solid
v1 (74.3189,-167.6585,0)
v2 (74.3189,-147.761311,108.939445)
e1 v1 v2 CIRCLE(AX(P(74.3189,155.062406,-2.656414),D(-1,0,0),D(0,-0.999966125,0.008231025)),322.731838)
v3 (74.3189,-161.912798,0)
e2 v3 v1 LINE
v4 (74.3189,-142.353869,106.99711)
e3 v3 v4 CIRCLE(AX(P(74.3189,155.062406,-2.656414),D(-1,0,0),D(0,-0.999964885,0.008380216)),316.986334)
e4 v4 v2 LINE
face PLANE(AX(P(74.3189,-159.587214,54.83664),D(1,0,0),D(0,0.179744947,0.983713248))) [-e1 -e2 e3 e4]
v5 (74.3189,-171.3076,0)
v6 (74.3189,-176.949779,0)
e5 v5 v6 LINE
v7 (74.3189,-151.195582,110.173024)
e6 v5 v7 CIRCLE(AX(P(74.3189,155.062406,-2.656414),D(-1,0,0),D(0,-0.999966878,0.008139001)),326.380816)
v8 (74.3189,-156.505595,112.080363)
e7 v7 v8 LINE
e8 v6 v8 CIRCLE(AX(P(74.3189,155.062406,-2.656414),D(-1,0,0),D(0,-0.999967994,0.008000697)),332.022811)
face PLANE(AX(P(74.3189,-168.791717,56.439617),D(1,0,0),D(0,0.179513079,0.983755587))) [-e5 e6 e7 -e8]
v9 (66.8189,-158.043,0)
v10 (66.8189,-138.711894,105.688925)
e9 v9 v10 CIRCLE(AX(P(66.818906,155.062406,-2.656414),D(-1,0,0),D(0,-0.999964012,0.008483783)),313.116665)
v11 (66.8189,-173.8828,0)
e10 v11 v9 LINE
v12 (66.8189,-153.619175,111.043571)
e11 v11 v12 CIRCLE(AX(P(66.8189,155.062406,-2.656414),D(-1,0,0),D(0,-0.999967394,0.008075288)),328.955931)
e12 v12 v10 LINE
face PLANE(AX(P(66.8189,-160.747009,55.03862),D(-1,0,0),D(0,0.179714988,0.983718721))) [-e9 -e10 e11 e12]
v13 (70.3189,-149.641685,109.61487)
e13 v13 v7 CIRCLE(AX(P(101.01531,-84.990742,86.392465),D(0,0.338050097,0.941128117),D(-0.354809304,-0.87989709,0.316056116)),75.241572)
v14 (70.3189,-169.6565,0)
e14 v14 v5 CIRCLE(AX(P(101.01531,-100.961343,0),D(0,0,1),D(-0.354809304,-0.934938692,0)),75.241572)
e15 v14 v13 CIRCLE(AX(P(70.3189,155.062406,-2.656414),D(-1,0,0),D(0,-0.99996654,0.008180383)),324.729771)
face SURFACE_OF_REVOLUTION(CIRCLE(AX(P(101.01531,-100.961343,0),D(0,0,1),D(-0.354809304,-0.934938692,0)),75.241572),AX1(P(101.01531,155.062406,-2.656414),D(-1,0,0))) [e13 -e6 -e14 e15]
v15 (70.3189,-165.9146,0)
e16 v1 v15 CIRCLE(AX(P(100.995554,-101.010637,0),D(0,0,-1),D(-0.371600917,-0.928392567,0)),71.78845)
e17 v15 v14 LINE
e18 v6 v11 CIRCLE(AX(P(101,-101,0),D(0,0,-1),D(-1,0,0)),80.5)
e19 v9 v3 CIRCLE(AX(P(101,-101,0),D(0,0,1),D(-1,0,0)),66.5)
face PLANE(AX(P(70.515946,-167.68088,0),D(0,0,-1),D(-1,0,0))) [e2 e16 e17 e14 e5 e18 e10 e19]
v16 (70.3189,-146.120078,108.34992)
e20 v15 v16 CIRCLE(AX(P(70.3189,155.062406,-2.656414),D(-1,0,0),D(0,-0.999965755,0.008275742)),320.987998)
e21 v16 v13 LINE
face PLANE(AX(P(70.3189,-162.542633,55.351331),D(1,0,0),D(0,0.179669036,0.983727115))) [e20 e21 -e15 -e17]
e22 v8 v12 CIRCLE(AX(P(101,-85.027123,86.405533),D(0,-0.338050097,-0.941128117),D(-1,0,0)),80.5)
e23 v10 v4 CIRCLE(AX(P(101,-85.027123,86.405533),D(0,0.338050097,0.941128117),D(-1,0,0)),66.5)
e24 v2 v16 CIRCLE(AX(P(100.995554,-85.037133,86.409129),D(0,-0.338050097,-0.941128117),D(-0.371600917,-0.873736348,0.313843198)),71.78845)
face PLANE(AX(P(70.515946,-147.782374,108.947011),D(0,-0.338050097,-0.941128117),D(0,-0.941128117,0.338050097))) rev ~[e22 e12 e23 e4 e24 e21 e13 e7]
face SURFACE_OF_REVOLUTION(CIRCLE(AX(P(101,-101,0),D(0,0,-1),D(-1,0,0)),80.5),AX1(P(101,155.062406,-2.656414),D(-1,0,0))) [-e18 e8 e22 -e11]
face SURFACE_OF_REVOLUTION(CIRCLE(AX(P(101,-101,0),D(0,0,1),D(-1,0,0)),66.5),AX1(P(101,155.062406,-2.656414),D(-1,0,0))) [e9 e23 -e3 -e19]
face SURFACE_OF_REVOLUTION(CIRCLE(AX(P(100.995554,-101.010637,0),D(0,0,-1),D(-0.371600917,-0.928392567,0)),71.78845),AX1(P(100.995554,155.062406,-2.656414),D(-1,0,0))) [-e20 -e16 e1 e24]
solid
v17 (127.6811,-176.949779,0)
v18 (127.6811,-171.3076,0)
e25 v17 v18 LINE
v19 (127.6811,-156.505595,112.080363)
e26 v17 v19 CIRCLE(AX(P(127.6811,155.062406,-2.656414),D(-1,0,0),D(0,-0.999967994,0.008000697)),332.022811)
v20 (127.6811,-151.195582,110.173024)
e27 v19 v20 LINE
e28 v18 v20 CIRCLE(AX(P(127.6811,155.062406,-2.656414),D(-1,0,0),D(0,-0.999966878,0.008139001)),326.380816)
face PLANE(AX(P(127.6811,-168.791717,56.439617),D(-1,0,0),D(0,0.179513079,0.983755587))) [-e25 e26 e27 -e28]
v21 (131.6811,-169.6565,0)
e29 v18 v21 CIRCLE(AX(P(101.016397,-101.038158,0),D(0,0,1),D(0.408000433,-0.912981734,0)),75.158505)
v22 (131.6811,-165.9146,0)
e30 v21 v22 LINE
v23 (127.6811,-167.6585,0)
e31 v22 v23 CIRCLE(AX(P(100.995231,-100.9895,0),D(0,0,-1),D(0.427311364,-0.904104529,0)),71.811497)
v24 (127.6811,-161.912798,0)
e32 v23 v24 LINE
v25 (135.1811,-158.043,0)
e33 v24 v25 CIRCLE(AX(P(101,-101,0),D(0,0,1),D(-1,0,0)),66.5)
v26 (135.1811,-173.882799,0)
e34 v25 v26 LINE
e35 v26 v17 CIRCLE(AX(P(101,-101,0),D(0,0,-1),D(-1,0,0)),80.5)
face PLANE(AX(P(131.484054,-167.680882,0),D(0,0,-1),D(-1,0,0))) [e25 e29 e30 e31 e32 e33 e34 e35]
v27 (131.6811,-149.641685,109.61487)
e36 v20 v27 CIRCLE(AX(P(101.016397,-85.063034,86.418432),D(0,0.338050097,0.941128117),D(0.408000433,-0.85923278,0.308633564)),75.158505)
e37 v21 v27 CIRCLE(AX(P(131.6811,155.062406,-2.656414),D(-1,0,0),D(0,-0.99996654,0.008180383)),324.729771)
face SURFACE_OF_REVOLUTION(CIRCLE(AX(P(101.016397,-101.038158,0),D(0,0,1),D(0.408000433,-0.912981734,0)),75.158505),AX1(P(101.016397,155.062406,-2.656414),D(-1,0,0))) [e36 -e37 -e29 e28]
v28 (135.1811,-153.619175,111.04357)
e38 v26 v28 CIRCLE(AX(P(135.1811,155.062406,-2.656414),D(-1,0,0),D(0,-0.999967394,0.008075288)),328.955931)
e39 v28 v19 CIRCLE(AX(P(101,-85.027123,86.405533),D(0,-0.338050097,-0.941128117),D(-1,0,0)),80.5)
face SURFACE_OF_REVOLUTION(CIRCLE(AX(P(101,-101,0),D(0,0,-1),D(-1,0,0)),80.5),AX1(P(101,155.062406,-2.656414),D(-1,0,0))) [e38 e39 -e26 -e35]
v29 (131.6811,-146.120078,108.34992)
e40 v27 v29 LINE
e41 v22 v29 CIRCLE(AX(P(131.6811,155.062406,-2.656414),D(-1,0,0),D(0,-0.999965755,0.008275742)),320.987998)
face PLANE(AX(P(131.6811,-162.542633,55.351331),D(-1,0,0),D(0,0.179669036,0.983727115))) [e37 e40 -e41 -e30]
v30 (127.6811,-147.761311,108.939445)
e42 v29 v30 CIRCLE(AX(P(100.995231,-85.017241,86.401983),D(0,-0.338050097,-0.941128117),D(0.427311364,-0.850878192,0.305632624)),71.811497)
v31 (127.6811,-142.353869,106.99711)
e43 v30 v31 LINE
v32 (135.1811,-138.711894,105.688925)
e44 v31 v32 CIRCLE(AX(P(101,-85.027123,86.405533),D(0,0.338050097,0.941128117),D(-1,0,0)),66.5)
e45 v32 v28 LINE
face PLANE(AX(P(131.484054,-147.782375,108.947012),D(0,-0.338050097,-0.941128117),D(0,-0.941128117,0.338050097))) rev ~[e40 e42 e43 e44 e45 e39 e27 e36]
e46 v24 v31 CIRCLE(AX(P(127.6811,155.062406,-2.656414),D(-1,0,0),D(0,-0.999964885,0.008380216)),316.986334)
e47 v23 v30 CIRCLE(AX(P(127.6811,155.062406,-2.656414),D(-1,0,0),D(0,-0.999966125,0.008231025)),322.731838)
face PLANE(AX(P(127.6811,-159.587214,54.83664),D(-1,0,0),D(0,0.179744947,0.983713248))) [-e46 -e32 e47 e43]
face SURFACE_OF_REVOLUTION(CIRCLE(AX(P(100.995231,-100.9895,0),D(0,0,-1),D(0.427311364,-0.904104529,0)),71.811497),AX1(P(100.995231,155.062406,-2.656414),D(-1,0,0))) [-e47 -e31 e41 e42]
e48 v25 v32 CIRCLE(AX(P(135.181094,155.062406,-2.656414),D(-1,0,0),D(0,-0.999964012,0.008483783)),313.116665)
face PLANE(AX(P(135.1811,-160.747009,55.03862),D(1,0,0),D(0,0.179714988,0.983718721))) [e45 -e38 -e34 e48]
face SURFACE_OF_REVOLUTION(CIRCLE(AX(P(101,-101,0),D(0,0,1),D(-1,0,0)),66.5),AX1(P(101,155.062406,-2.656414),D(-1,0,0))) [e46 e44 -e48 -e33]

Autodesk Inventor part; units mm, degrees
ref_plane "XZ Plane" through (0, 0, 0) normal (0, 1, 0) x (-1, 0, 0)
sketch "Эскиз1" plane through (0, 0, 0) normal (0, 0, 1) x (1, 0, 0)
  arc A0 (74.5189, -162) -> (127.4811, -162) centre (101, -101) ccw
  arc A1 (48.4714, -162) -> (153.5286, -162) centre (101, -101) ccw
  line L0 (-97.5257, 0) -> (307.6841, 0) projected
  line L1 (-39.6386, -162) -> (244.9538, -162)
  line L2 (101, -167.5) -> (101, -181.5)
  arc A2 (142.003, -162) -> (59.997, -162) centre (101, -101) ccw
  circle A3 centre (101, -101) radius 72
  circle A4 centre (101, -101) radius 75
  line L3 (170.7391, -120.21) -> (170.39, -120.21)
  line L4 (170.39, -120.21) -> (173.4981, -120.21)
  line L5 (31.61, -120.21) -> (28.5019, -120.21)
  line L6 (74.5189, -162) -> (74.5189, -177.0197)
  line L7 (127.4811, -162) -> (127.4811, -177.0197)
  line L8 (70.5189, -166.2296) -> (70.5189, -169.5266)
  line L9 (131.4811, -166.2296) -> (131.4811, -169.5266)
  point P0 (0, 0)
  point P1 (167.5699, -124.21)
  point P2 (163.3181, -124.21)
  point P3 (38.6819, -124.21)
  point P4 (34.4301, -124.21)
  point P5 (101, -174.5)
  point P6 (57.3652, -162)
  point P7 (144.6348, -162)
  point P8 (62.7508, -162)
  point P9 (170.7391, -120.21)
  point P10 (74.5189, -167.9533)
  point P11 (74.5189, -171.1694)
  point P12 (127.4811, -171.1694)
  point P13 (127.4811, -167.9533)
  dimension "d0" = 133
  dimension "d1" = 161
  dimension "d3" = -101
  dimension "d4" = 61
  dimension "d30" = 1.5
  dimension "d31" = 1.5
  dimension "d33" = 73.5
  dimension "d34" = 4
ref_plane "РабПлоскость1" through (0, 0, 60) normal (0, 0, 1) x (1, 0, 0)
sketch "Эскиз2" plane through (0, 0, 60) normal (0, 0, 1) x (1, 0, 0)
  circle A0 centre (101, -101) radius 70.5
  line L0 (-96.1046, 0) -> (307.4472, 0) projected
  arc A1 (34.4301, -164.21) -> (167.5699, -164.21) centre (101, -141) ccw
  arc A2 (38.6819, -164.21) -> (163.3181, -164.21) centre (101, -141) ccw
  line L1 (-38.4543, -164.21) -> (249.797, -164.21)
  point P0 (0, 0)
  dimension "d9" = 141
  dimension "d10" = 141
  dimension "d11" = 133
  dimension "d12" = 23.21
sketch "Эскиз3" plane through (0, 0, 0) normal (1, 0, 0) x (0, 1, 0)
  arc A0 (-211.5, 60) -> (-171.5, 0) centre (-52.4181, 122.7213) ccw
  point P0 (0, 0)
  point P1 (-164.21, 60)
  point P2 (-162, 0)
  dimension "d13" = 171
sketch "Эскиз4" plane through (0, 0, 0) normal (1, 0, 0) x (0, 1, 0)
  line L0 (0, -518.9739) -> (0, 512.8159) projected
  arc A0 (-151.3766, 110.2381) -> (-171.5, 0) centre (155.0612, -2.6563) ccw
  arc A1 (-171.3994, 5.874) -> (-171.5, 0) centre (0, 0) ccw
  point P0 (-131.3766, -110.2381)
  dimension "d25" = 326.572
sweep "Сдвиг2" add profiles "Эскиз1" path "Эскиз4" path curves A0 contours A0 L2 A3 L6 | A0 L7 A3 L2 | L6 A4 L8 A3 | A3 L2 A4 L6 | A3 L7 A4 L2 | A3 L9 A4 L7 | A4 L2 A1 L6 | A4 L7 A1 L2
ref_plane "РабПлоскость2" through (101, 0, 0) normal (1, 0, 0) x (0, 1, 0)
sketch "Эскиз5" plane through (101, 0, 0) normal (1, 0, 0) x (0, 1, 0)
  line L0 (-177.0197, 0) -> (-177.0197, 0) projected
  line L1 (-156.5714, 112.104) -> (-156.5714, 112.104) projected
  line L2 (-177.0197, 0) -> (-177.0197, 0) projected
  line L3 (-156.5714, 112.104) -> (-156.5714, 112.104) projected
  arc A0 (-162, 0) -> (-142.4359, 107.0266) centre (155.0612, -2.6563) ccw projected
  line L4 (-162, 0) -> (-181.5, 0) projected
  circle A1 centre (155.0612, -2.6563) radius 336.5717
  arc A2 (-156.5714, 112.104) -> (-177.0197, 0) centre (155.0612, -2.6563) ccw projected
  arc A3 (-156.5714, 112.104) -> (-177.0197, 0) centre (155.0612, -2.6563) ccw projected
  arc A4 (-156.5714, 112.104) -> (-177.0197, 0) centre (155.0612, -2.6563) ccw projected
  arc A5 (-156.5714, 112.104) -> (-177.0197, 0) centre (155.0612, -2.6563) ccw projected
  point P0 (0, 0)
  point P1 (-162, 0)
  point P2 (-142.4359, 107.0266)
  point P3 (-162, 0)
  point P4 (-142.4359, 107.0266)
  dimension "d28" = 673.1434
sketch "Эскиз7" plane through (101, -101, 0) normal (0, 0, -1) x (-1, 0, 0)
  arc A0 (26.4811, -66.9533) -> (30.4811, -65.2296) centre (0, 0) ccw projected
  line L0 (26.4811, -61) -> (26.4811, -66.9533) projected
  arc A1 (-26.4811, -61) -> (26.4811, -61) centre (0, 0) ccw projected
  line L1 (-26.4811, -66.9533) -> (-26.4811, -61) projected
  arc A2 (-30.4811, -65.2296) -> (-26.4811, -66.9533) centre (0, 0) ccw projected
  line L2 (-30.4811, -68.5266) -> (-30.4811, -65.2296) projected
  arc A3 (-30.4811, -68.5266) -> (-26.4811, -70.1694) centre (0, 0) ccw projected
  line L3 (-26.4811, -76.0197) -> (-26.4811, -70.1694) projected
  arc A4 (-26.4811, -76.0197) -> (26.4811, -76.0197) centre (0, 0) ccw projected
  line L4 (26.4811, -70.1694) -> (26.4811, -76.0197) projected
  arc A5 (26.4811, -70.1694) -> (30.4811, -68.5266) centre (0, 0) ccw projected
  line L5 (30.4811, -65.2296) -> (30.4811, -68.5266) projected
  line L6 (-26.6811, -66.6585) -> (-26.6811, -60.6944)
  arc A6 (-26.6811, -60.6944) -> (26.6811, -60.6944) centre (0, 0) ccw
  line L7 (26.6811, -60.6944) -> (26.6811, -66.6585)
  arc A7 (26.6811, -66.6585) -> (30.6811, -64.9146) centre (0, 0) ccw
  line L8 (30.6811, -64.9146) -> (30.6811, -68.6565)
  arc A8 (26.6811, -70.3076) -> (30.6811, -68.6565) centre (0, 0) ccw
  line L9 (26.6811, -70.3076) -> (26.6811, -76.1617)
  arc A9 (-26.6811, -76.1617) -> (26.6811, -76.1617) centre (0, 0) ccw
  line L10 (-26.6811, -76.1617) -> (-26.6811, -70.3076)
  arc A10 (-30.6811, -68.6565) -> (-26.6811, -70.3076) centre (0, 0) ccw
  line L11 (-30.6811, -68.6565) -> (-30.6811, -64.9146)
  arc A11 (-30.6811, -64.9146) -> (-26.6811, -66.6585) centre (0, 0) ccw
  circle A12 centre (0, 0) radius 66.5
  line L12 (-34.1811, -57.043) -> (-34.1811, -72.8828)
  line L13 (-26.4811, -66.9533) -> (-26.4811, -61) projected
  circle A13 centre (0, 0) radius 80.5
  line L14 (34.1811, -57.043) -> (34.1811, -72.8828)
  point P0 (101, 101)
  point P1 (26.6811, -75.9498)
  point P2 (34.1811, -72.8828)
  point P3 (34.1811, -57.043)
  point P4 (26.6811, -60.9128)
  point P5 (-26.6811, -60.9128)
  point P6 (-26.6811, -75.9498)
  dimension "d35" = 0.2
  dimension "d36" = 3.5
sketch3d "3D эскиз1"
  arc A0 (127.4811, -177.0197, 0) -> (127.4811, -156.5714, 112.104) centre (127.4811, 155.0612, -2.6563) ccw
sweep "Сдвиг3" add profiles "Эскиз7" path "3D эскиз1" contours A12 L14 A13 L9 A8 L8 A7 L7 | L6 A11 L11 A10 L10 A13 L12 A12
sketch "Эскиз8" plane through (101, -101, 0) normal (0, 0, -1) x (-1, 0, 0)
  arc A0 (26.4811, -66.9533) -> (30.4811, -65.2296) centre (0, 0) ccw projected
  line L0 (26.4811, -61) -> (26.4811, -66.9533) projected
  arc A1 (-26.4811, -61) -> (26.4811, -61) centre (0, 0) ccw projected
  line L1 (-26.4811, -66.9533) -> (-26.4811, -61) projected
  arc A2 (-30.4811, -65.2296) -> (-26.4811, -66.9533) centre (0, 0) ccw projected
  line L2 (-30.4811, -68.5266) -> (-30.4811, -65.2296) projected
  arc A3 (-30.4811, -68.5266) -> (-26.4811, -70.1694) centre (0, 0) ccw projected
  line L3 (-26.4811, -76.0197) -> (-26.4811, -70.1694) projected
  arc A4 (-26.4811, -76.0197) -> (26.4811, -76.0197) centre (0, 0) ccw projected
  line L4 (26.4811, -70.1694) -> (26.4811, -76.0197) projected
  arc A5 (26.4811, -70.1694) -> (30.4811, -68.5266) centre (0, 0) ccw projected
  line L5 (30.4811, -65.2296) -> (30.4811, -68.5266) projected
  point P0 (101, 101)
sketch3d "3D эскиз2"
  arc A0 (135.1811, -173.8828, 0) -> (135.1811, -153.6191, 111.0436) centre (135.1811, 155.0612, -2.6563) ccw
sweep "Сдвиг4" cut profiles "Эскиз8" path "3D эскиз2"
properties part number "крепл направления"
